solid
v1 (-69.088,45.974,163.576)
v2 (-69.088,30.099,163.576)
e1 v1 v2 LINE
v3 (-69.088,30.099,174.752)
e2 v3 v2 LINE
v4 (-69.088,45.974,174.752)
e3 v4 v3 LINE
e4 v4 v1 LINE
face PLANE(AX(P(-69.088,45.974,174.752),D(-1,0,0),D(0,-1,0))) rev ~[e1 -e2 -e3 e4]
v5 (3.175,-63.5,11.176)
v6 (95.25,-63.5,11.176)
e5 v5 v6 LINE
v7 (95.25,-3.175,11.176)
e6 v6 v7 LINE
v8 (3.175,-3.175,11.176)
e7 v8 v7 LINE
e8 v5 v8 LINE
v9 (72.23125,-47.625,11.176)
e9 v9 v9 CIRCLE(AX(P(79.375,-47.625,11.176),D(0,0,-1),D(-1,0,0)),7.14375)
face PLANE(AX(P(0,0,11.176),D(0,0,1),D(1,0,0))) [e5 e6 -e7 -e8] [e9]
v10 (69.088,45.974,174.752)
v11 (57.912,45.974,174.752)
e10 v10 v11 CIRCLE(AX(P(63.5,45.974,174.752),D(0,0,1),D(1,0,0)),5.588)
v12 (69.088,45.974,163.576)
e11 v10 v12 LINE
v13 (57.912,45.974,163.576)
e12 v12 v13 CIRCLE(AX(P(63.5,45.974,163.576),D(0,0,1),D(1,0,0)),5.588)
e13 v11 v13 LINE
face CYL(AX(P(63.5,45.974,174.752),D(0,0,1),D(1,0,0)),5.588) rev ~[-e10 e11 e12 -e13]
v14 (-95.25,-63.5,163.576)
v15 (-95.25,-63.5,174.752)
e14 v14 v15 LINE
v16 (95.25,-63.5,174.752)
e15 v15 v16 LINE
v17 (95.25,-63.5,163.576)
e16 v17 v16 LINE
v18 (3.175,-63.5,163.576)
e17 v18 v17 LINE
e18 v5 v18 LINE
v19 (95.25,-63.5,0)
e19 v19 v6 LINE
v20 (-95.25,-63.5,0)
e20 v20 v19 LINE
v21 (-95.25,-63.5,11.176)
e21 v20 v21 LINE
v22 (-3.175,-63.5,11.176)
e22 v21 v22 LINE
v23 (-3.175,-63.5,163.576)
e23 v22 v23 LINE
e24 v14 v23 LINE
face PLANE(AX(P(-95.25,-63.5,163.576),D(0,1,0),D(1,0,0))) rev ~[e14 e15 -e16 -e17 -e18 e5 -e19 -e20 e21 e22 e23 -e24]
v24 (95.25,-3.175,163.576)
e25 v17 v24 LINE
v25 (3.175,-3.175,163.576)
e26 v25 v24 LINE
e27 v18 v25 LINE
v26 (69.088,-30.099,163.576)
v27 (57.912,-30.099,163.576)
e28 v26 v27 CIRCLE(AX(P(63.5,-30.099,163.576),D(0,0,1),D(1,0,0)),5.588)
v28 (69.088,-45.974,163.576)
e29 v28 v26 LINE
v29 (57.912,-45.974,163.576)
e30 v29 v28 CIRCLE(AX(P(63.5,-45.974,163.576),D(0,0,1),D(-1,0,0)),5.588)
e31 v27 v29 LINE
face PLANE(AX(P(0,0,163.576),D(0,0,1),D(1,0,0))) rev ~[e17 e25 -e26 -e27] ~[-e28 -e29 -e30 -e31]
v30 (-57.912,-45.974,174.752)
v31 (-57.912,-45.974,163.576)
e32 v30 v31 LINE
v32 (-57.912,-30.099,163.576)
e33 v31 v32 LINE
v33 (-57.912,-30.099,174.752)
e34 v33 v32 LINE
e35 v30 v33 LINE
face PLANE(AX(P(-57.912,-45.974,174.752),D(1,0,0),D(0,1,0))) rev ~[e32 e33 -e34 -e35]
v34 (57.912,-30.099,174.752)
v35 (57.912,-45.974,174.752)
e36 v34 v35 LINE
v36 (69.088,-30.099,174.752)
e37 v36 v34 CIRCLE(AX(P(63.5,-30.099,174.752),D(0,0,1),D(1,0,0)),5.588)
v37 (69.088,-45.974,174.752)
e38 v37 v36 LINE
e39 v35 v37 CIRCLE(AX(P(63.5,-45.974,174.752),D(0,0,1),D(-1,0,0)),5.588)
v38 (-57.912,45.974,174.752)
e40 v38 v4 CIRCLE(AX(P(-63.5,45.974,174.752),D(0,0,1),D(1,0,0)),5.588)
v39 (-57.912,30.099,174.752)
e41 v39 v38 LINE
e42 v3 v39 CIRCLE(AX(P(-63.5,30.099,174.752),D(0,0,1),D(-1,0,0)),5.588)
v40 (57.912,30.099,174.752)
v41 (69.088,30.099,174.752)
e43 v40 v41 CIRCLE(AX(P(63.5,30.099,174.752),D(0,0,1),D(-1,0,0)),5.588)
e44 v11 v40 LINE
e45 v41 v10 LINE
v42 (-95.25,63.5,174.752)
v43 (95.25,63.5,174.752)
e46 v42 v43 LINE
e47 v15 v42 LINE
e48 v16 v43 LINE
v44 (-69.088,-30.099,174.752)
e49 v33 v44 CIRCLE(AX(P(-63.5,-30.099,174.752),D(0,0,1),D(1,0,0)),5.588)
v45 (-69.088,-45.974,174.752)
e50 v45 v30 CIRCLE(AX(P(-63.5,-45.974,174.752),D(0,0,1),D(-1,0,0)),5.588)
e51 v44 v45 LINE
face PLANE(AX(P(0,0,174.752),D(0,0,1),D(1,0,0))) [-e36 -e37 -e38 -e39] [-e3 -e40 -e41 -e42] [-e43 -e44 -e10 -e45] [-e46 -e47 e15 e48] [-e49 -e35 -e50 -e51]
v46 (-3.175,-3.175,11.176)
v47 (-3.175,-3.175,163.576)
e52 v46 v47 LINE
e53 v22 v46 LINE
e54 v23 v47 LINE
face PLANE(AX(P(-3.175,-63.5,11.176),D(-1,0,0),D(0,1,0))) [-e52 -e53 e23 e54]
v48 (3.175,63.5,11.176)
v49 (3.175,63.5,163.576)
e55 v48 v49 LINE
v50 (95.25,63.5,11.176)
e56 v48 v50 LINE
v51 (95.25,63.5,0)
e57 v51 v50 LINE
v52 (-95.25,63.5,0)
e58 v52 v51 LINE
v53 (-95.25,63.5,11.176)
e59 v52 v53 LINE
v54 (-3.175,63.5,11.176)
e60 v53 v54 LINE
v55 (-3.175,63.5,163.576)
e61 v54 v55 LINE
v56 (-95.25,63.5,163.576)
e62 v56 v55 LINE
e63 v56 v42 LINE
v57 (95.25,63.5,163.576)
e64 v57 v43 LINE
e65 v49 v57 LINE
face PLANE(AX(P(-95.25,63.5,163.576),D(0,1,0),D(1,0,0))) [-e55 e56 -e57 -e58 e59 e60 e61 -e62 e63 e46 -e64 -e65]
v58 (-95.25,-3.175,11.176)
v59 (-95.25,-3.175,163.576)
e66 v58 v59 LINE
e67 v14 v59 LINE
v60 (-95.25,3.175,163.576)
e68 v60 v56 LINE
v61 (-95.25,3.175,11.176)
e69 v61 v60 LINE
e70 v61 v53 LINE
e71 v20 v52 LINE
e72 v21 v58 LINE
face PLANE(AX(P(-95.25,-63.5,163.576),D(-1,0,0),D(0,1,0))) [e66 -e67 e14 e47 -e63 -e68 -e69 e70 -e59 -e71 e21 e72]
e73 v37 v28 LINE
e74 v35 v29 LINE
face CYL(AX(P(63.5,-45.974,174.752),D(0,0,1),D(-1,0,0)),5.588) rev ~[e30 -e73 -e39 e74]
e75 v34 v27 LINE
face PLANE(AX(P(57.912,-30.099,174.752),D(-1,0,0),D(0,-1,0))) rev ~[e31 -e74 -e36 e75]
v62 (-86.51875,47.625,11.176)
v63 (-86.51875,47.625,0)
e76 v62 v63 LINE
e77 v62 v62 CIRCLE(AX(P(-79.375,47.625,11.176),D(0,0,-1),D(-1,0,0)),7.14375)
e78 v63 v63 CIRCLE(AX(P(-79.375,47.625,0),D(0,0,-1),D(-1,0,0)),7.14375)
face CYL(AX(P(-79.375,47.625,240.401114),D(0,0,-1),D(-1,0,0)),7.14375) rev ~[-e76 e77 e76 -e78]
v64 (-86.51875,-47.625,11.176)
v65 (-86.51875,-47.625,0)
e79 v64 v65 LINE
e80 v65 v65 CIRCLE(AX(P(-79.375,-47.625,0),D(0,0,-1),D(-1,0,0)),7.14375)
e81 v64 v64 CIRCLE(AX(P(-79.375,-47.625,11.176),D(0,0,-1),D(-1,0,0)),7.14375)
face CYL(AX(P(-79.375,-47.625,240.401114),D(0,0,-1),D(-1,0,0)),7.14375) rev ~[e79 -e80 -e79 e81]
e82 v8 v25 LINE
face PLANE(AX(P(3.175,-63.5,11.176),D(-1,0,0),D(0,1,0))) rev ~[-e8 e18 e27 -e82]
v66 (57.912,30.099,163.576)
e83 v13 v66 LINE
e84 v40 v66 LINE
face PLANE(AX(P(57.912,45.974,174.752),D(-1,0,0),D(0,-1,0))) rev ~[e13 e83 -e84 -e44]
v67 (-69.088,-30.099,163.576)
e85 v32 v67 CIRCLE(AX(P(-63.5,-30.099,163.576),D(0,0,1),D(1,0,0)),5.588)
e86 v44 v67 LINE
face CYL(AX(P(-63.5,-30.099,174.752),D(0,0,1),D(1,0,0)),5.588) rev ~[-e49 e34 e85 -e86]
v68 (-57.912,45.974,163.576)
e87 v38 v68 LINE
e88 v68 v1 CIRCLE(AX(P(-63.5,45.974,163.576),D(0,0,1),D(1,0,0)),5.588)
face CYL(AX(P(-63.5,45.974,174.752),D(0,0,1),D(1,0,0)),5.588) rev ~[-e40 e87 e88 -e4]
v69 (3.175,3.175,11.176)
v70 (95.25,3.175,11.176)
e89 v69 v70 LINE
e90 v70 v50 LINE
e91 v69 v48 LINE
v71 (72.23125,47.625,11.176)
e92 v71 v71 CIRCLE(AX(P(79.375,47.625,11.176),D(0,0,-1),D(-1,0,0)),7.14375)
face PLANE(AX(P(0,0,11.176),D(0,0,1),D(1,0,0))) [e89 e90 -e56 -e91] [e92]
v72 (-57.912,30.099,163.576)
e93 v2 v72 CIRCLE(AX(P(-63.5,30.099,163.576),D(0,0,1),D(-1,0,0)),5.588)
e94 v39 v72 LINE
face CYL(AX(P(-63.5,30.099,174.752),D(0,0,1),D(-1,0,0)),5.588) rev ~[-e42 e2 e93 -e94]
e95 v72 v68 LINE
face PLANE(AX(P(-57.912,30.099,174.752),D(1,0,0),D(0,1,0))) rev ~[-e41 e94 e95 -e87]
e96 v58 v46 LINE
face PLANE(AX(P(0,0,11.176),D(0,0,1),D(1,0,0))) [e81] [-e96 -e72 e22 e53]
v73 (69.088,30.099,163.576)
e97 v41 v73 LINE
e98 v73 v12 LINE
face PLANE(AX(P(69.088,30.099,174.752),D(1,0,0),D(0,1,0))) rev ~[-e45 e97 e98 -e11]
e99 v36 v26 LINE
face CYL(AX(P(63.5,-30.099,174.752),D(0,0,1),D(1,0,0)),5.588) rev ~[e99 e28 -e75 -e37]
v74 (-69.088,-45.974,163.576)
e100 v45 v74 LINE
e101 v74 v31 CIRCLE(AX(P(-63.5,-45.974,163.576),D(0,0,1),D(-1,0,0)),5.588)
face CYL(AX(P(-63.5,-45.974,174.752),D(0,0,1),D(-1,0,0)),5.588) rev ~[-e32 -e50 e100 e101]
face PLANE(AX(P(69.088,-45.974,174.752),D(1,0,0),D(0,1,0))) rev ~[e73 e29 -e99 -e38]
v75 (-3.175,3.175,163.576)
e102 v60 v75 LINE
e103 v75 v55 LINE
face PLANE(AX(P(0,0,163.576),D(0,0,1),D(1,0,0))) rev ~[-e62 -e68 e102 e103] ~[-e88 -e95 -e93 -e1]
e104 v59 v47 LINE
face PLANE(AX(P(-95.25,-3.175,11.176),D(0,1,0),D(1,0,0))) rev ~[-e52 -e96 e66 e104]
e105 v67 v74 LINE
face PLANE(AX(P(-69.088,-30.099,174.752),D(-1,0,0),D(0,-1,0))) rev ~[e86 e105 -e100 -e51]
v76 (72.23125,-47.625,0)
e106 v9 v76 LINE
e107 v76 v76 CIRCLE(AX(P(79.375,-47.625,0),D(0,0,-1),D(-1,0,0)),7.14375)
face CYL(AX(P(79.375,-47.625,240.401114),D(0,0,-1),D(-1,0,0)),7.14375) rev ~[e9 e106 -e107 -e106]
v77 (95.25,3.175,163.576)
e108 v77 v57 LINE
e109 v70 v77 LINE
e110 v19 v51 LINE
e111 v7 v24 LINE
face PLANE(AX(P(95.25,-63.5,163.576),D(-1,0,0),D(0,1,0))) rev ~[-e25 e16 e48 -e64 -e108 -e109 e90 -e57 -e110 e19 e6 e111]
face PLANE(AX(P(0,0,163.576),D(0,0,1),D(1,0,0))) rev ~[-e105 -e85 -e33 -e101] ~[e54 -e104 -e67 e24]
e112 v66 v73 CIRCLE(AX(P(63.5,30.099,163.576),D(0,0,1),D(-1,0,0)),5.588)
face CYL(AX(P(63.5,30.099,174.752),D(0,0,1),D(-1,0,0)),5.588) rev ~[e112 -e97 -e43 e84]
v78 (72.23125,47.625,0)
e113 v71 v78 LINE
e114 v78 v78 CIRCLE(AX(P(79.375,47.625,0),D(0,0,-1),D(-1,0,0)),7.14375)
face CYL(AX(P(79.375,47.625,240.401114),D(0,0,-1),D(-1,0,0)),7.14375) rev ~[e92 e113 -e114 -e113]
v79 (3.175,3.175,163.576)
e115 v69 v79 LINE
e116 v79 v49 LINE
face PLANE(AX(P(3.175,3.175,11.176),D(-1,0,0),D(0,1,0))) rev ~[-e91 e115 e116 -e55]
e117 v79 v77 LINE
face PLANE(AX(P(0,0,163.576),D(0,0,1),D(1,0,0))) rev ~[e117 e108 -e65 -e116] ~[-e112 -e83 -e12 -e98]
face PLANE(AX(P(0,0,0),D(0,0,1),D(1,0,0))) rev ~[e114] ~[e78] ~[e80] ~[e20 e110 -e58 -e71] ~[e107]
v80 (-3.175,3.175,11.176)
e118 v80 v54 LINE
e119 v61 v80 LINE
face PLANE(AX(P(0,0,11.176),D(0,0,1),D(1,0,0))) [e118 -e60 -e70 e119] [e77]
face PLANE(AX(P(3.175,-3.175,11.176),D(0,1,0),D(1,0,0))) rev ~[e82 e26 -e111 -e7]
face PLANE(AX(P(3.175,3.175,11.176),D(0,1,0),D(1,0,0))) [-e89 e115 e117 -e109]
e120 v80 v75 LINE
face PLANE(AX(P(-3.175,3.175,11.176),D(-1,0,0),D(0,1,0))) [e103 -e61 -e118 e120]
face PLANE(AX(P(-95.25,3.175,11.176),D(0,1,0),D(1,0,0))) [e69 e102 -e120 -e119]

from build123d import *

# Parameters (mm, degrees)
F0_W     = 190.5
F0_H     = 127
F1_DEPTH = 11.176
F3_D     = 14.2875
F4_W     = 92.075
F4_H     = 6.35
F4_W_2   = 6.35
F4_H_2   = 60.325
F5_DEPTH = 152.4
F6_W     = 190.5
F6_H     = 127
F7_DEPTH = 11.176
F9_DEPTH = 25.4


# Not quite as in the source:
# - a length typed as a fraction of an inch, garbled in the dataset ("3 / 203.2 mm" for 3/8 in), is restored


with BuildPart() as f1:
    # F0 (on Top) → F1 (new body)
    with BuildSketch(Plane.XY):
        Rectangle(F0_W, F0_H)
    extrude(amount=F1_DEPTH)

    # F3 (through all)
    with Locations(Plane.XY.offset(11.176)):
        with Locations((-79.375, 47.625), (79.375, 47.625), (-79.375, -47.625), (79.375, -47.625)):
            Hole(F3_D / 2)

    # F4 (on face) → F5 (join)
    with BuildSketch(Plane.XY.offset(11.176)):
        with Locations((-49.2125, 0)):
            Rectangle(F4_W, F4_H)
        with Locations((0, 33.3375)):
            Rectangle(F4_W_2, F4_H_2)
        Rectangle(F4_W_2, F4_H)
        with Locations((49.2125, 0)):
            Rectangle(F4_W, F4_H)
        with Locations((0, -33.3375)):
            Rectangle(F4_W_2, F4_H_2)
    extrude(amount=F5_DEPTH)

    # F6 (on face) → F7 (join)
    with BuildSketch(Plane.XY.offset(163.576)):
        Rectangle(F6_W, F6_H)
    extrude(amount=F7_DEPTH)

    # F8 (on face) → F9 (cut)
    with BuildSketch(Plane.XY.offset(174.752)):
        with BuildLine():
            ThreePointArc((-69.088, -45.974), (-63.5, -51.562), (-57.912, -45.974))
            Line((-57.912, -45.974), (-57.912, -30.099))
            ThreePointArc((-57.912, -30.099), (-63.5, -24.511), (-69.088, -30.099))
            Line((-69.088, -30.099), (-69.088, -45.974))
        make_face()
        with BuildLine():
            Line((-57.912, 30.099), (-57.912, 45.974))
            ThreePointArc((-57.912, 45.974), (-63.5, 51.562), (-69.088, 45.974))
            Line((-69.088, 45.974), (-69.088, 30.099))
            ThreePointArc((-69.088, 30.099), (-63.5, 24.511), (-57.912, 30.099))
        make_face()
        with BuildLine():
            Line((69.088, 30.099), (69.088, 45.974))
            ThreePointArc((69.088, 45.974), (63.5, 51.562), (57.912, 45.974))
            Line((57.912, 45.974), (57.912, 30.099))
            ThreePointArc((57.912, 30.099), (63.5, 24.511), (69.088, 30.099))
        make_face()
        with BuildLine():
            Line((57.912, -30.099), (57.912, -45.974))
            ThreePointArc((57.912, -45.974), (63.5, -51.562), (69.088, -45.974))
            Line((69.088, -45.974), (69.088, -30.099))
            ThreePointArc((69.088, -30.099), (63.5, -24.511), (57.912, -30.099))
        make_face()
    extrude(amount=-F9_DEPTH, mode=Mode.SUBTRACT)


solid = f1.part
